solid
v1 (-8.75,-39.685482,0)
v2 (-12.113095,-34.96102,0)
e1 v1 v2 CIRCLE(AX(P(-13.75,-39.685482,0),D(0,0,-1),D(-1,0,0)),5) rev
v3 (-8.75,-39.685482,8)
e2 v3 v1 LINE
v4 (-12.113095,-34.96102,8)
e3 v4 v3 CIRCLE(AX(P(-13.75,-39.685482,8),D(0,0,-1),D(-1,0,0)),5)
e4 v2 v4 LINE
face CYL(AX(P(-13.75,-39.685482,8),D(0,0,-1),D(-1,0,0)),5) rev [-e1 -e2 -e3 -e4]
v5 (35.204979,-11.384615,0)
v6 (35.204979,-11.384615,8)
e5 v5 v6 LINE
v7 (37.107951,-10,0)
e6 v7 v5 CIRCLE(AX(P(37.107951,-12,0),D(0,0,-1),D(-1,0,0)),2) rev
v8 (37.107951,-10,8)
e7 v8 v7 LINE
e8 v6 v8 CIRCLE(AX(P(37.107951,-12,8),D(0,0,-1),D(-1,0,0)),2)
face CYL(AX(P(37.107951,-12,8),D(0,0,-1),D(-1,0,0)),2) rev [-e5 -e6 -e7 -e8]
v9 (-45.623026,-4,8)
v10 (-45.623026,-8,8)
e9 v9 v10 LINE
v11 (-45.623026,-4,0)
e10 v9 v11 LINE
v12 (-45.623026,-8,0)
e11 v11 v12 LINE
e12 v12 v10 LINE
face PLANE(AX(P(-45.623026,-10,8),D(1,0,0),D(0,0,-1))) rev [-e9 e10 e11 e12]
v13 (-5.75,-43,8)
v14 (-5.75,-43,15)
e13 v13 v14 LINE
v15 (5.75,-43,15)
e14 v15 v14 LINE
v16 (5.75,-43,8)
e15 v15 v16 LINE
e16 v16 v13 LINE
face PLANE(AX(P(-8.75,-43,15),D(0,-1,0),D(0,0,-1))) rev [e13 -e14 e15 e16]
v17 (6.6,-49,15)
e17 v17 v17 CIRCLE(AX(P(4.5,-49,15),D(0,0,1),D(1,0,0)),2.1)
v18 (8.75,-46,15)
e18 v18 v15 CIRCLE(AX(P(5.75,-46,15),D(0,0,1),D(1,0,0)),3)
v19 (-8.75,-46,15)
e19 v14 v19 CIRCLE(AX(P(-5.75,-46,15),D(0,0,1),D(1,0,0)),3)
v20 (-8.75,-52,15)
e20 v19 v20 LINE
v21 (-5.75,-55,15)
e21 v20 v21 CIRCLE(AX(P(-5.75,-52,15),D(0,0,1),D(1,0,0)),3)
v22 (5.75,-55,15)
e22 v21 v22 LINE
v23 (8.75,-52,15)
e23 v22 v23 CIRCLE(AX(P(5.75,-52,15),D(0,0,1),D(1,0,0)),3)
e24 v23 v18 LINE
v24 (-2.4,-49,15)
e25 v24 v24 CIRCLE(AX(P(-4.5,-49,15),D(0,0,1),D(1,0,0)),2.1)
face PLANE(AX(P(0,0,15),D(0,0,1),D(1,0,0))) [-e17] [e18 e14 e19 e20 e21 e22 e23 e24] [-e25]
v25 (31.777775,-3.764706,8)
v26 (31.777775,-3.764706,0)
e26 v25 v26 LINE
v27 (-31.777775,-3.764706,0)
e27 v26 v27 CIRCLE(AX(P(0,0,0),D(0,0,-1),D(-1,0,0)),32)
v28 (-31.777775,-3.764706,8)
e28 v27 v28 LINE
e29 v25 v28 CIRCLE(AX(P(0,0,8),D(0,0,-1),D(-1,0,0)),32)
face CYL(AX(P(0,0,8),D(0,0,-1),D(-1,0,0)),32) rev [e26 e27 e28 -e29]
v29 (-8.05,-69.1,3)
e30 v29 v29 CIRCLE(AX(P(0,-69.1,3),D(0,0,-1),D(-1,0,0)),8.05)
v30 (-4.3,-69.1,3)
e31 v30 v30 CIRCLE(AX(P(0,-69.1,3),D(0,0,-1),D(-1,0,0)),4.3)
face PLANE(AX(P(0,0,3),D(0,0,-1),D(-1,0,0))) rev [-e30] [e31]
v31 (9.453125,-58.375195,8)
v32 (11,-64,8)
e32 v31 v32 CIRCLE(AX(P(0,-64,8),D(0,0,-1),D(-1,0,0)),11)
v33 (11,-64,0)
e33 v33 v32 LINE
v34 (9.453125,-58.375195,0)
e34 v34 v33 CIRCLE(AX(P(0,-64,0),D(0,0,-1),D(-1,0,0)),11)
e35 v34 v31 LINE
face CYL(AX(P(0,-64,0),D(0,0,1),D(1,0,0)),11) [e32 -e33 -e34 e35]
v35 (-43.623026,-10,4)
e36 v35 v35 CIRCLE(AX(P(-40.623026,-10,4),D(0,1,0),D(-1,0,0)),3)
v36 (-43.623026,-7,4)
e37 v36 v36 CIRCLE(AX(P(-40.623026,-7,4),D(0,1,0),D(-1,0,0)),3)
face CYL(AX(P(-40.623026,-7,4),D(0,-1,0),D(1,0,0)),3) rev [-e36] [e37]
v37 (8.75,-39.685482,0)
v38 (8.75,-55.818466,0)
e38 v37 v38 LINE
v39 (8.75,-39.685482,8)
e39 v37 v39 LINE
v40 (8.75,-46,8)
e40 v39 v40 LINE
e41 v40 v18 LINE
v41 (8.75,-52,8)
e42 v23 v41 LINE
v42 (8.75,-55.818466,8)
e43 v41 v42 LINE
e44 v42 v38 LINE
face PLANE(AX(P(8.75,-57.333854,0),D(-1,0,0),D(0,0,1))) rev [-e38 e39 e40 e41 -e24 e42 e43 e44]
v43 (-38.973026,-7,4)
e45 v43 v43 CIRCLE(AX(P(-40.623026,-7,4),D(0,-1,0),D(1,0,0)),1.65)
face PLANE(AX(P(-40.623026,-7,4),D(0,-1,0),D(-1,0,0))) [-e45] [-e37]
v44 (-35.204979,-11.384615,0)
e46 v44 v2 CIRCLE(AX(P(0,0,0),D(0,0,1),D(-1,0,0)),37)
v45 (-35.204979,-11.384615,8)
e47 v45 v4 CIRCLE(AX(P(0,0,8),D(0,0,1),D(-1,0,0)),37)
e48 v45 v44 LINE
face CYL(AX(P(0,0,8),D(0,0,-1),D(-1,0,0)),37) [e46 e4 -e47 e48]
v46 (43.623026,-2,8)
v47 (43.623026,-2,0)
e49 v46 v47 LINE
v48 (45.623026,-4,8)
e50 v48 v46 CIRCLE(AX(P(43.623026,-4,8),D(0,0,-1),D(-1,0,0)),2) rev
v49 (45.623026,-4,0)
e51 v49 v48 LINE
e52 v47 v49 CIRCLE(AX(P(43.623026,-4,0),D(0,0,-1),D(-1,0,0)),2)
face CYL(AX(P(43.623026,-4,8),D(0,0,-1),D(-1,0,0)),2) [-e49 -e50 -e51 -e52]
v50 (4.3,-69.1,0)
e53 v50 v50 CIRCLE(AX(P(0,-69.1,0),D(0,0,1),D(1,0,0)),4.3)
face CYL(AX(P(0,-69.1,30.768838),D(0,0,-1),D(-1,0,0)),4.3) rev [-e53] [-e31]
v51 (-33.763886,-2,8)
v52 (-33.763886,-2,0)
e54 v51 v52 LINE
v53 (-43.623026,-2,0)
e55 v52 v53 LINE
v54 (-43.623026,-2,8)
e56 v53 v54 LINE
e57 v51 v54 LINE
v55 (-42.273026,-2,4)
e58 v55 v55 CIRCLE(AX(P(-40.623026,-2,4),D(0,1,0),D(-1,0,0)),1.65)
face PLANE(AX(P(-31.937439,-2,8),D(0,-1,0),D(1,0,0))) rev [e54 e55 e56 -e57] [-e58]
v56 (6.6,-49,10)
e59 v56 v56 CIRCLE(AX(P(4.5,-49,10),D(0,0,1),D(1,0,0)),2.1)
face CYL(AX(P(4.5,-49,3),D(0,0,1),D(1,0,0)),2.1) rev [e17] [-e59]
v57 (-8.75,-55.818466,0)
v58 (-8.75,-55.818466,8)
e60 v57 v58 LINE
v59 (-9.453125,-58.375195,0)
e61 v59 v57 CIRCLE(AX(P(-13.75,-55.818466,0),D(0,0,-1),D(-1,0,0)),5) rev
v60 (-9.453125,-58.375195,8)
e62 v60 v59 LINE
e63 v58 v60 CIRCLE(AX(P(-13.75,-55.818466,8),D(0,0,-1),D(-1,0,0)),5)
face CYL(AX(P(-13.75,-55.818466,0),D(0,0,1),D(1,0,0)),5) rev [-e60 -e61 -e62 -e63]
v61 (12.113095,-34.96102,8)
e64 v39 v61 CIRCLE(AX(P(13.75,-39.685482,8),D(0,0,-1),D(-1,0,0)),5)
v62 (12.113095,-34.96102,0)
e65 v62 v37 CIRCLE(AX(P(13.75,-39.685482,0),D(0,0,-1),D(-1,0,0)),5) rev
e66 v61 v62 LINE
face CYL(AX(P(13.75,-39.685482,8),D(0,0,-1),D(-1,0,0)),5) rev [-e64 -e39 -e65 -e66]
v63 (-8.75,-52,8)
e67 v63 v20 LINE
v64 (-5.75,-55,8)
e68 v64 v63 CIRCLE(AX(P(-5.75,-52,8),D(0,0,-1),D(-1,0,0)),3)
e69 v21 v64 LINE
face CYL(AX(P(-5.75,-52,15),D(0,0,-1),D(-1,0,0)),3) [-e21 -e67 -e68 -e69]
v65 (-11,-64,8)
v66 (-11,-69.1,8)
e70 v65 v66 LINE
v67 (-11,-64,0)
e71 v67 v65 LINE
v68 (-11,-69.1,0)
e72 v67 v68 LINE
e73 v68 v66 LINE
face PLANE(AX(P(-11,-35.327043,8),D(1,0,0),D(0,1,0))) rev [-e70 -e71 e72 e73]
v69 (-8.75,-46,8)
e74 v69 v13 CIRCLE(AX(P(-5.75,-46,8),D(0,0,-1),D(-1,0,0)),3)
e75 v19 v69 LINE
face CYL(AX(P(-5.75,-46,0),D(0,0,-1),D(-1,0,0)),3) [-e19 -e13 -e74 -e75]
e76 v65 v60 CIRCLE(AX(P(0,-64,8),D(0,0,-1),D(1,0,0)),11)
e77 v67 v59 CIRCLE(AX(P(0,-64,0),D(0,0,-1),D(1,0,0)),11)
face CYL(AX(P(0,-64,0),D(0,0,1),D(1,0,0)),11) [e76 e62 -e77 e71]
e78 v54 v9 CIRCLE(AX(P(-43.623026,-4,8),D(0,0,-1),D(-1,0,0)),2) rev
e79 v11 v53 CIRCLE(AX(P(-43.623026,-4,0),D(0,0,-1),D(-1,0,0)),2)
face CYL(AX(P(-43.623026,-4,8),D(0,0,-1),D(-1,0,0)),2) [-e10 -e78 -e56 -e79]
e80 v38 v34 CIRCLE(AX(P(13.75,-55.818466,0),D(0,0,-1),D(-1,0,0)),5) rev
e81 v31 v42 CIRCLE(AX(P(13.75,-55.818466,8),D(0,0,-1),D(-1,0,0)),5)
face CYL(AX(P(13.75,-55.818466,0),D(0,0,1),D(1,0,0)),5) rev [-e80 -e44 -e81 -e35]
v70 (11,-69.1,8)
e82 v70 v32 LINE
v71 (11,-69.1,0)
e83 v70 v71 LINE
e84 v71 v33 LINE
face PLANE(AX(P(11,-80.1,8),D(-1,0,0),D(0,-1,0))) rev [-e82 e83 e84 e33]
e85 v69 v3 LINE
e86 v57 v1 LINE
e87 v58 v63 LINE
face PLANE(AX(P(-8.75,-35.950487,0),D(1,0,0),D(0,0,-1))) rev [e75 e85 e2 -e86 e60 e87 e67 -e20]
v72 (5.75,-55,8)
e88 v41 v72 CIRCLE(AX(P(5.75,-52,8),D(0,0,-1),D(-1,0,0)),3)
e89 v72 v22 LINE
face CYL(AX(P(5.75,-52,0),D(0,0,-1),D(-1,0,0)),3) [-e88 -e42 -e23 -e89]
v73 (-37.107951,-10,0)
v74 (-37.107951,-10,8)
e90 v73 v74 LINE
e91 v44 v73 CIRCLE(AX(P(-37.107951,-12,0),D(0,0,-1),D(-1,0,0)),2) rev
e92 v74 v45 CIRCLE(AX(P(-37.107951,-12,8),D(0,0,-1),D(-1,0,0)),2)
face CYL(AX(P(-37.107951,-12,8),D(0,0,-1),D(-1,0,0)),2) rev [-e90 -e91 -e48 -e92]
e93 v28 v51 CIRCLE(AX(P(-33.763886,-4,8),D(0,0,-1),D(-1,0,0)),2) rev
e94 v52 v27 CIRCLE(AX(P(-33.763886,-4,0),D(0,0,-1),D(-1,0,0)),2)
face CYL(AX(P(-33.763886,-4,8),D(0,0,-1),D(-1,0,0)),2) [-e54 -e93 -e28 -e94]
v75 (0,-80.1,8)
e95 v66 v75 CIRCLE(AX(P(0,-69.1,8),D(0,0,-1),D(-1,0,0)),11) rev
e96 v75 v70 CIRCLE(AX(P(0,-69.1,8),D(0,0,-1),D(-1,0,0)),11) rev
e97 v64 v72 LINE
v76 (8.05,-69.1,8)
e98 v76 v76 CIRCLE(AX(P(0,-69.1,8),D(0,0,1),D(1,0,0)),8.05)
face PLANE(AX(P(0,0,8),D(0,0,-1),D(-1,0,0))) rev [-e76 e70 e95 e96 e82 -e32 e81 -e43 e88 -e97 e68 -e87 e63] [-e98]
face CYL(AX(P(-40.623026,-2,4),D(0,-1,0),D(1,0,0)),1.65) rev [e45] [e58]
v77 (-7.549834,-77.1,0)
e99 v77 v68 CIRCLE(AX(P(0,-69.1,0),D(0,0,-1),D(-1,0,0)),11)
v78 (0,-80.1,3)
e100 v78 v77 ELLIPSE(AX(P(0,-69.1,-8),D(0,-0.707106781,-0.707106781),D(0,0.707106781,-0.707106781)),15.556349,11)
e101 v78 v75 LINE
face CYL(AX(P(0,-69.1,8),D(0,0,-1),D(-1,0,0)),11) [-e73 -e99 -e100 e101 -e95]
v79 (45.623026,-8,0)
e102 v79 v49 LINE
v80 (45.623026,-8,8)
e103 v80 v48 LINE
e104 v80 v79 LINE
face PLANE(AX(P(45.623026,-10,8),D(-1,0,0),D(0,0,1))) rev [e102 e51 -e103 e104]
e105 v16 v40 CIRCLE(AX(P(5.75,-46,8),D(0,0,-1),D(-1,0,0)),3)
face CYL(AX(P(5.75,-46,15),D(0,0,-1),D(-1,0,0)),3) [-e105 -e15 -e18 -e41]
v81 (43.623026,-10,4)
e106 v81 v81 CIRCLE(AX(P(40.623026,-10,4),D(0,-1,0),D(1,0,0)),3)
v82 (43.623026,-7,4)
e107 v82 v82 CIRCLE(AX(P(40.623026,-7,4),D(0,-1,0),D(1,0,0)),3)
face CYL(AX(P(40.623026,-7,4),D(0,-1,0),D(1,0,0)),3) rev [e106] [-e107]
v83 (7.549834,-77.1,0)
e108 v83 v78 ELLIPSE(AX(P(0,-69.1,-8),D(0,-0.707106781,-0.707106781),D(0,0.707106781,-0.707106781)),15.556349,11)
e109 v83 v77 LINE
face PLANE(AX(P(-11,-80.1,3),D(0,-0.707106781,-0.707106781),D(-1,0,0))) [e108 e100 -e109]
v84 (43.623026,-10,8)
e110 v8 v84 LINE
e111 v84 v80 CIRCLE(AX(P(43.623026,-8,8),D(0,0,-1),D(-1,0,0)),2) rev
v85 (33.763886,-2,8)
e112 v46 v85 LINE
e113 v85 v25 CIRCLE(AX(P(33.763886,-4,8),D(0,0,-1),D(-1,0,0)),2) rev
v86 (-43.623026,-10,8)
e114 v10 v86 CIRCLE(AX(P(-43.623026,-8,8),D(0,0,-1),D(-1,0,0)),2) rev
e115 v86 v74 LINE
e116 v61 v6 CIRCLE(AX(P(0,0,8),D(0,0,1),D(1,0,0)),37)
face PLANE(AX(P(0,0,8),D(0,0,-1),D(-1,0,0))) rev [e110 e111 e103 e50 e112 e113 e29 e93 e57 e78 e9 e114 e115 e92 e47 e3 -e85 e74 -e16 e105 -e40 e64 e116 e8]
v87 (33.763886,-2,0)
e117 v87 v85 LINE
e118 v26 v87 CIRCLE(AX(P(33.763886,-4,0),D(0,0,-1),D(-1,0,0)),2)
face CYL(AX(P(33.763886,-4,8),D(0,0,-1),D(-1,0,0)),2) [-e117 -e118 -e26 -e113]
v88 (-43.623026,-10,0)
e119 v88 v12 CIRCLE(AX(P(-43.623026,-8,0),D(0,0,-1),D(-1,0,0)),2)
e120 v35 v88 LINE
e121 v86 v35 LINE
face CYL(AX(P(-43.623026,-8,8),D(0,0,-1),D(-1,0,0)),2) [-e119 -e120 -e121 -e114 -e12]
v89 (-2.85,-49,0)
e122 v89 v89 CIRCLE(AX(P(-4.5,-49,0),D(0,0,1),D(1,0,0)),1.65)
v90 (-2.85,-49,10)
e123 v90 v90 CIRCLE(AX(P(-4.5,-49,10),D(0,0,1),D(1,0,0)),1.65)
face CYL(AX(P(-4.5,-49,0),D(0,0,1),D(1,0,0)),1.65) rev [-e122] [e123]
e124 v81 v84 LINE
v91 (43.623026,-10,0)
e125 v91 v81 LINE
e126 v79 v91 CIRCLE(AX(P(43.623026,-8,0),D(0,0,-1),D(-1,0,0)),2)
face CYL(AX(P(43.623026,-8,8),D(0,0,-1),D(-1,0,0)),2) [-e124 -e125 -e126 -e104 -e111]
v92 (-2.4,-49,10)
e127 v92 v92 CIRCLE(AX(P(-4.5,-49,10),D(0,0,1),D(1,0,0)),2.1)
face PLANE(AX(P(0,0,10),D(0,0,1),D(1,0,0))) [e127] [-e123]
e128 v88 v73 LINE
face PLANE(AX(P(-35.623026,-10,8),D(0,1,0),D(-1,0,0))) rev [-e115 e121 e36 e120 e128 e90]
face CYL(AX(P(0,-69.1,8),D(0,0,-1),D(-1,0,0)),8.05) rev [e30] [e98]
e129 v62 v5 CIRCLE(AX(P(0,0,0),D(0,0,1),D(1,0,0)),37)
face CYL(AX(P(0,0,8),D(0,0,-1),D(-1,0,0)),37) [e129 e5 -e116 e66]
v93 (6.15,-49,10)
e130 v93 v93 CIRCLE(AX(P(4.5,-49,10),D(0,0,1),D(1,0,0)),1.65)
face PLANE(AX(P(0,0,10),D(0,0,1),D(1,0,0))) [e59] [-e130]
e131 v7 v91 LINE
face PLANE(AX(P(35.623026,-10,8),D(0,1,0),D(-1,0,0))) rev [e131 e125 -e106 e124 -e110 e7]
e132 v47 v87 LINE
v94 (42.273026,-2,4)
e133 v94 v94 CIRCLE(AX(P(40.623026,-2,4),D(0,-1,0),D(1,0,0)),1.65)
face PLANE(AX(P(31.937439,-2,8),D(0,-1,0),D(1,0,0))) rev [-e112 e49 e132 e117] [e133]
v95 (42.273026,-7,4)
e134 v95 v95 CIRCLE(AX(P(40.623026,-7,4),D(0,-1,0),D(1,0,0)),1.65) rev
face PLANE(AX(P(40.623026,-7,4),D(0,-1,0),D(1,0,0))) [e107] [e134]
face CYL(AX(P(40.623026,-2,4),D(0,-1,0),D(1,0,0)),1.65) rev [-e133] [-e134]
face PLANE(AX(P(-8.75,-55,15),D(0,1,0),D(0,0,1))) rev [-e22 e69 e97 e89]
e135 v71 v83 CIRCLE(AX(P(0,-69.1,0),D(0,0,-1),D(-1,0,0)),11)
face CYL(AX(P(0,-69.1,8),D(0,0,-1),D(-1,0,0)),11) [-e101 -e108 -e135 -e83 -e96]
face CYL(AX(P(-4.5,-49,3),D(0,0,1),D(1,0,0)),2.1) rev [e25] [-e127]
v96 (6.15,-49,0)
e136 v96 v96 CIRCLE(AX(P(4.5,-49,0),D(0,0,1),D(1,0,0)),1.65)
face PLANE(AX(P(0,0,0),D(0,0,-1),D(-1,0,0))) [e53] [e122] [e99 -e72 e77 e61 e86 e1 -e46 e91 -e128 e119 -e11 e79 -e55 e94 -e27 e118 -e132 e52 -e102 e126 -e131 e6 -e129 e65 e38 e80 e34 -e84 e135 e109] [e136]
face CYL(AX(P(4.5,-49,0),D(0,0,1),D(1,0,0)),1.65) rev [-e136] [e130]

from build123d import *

# Parameters (mm, degrees)
SKETCH3_R           = 8.05
BOSS_EXTRUDE1_DEPTH = 8
SKETCH4_R           = 8.05
SKETCH4_R_2         = 4.3
BOSS_EXTRUDE2_DEPTH = 3
CHAMFER1_SIZE       = 3
FILLET1_R           = 11
SKETCH5_R           = 1.65
CUT_EXTRUDE1_DEPTH  = 85.020655349
SKETCH6_R           = 3
CUT_EXTRUDE2_DEPTH  = 3
SKETCH7_R           = 2.1
CUT_EXTRUDE3_DEPTH  = 5
SKETCH8_R           = 1.65
CUT_EXTRUDE4_DEPTH  = 93.528214752
CUT_EXTRUDE5_DEPTH  = 93.528214752
FILLET2_R           = 5
FILLET3_R           = 2
BOSS_EXTRUDE3_START = 7
SKETCH10_W          = 17.5
SKETCH10_H          = 12
SKETCH10_R          = 2.1
BOSS_EXTRUDE3_DEPTH = 7
FILLET4_R           = 3
BOSS_EXTRUDE4_START = 7
SKETCH11_R          = 2.1
SKETCH11_R_2        = 1.65
BOSS_EXTRUDE4_DEPTH = 7


with BuildPart() as part:
    # Sketch3 → Boss-Extrude1 (new body)
    with BuildSketch(Plane.XY):
        with BuildLine():
            Line((-31.937438845, -2), (-45.623026261, -2))
            Line((-45.623026261, -2), (-45.623026261, -10))
            Line((-45.623026261, -10), (-35.623026261, -10))
            ThreePointArc((-35.623026261, -10), (-26.529067588, -25.791637654), (-11, -35.327043465))
            Line((-11, -35.327043465), (-11, -80.1))
            Line((-11, -80.1), (11, -80.1))
            Line((11, -80.1), (11, -35.327043465))
            ThreePointArc((11, -35.327043465), (26.529067588, -25.791637654), (35.623026261, -10))
            Line((35.623026261, -10), (45.623026261, -10))
            Line((45.623026261, -10), (45.623026261, -2))
            Line((45.623026261, -2), (31.937438845, -2))
            ThreePointArc((31.937438845, -2), (0, -32), (-31.937438845, -2))
        make_face()
        with Locations((0, -69.1)):
            Circle(SKETCH3_R, mode=Mode.SUBTRACT)
    extrude(amount=BOSS_EXTRUDE1_DEPTH)

    # Sketch4 → Boss-Extrude2 (add)
    with BuildSketch(Plane.XY):
        with Locations(Location((0, -69.1, 0), (0, 0, 180))):
            Circle(SKETCH4_R)
        with Locations(Location((0, -69.1, 0), (0, 0, 180))):
            Circle(SKETCH4_R_2, mode=Mode.SUBTRACT)
    extrude(amount=BOSS_EXTRUDE2_DEPTH)

    # Chamfer1
    chamfer1_edges = [part.edges().sort_by_distance(p)[0] for p in [
        (0, -80.1, 0),
    ]]
    chamfer(chamfer1_edges, length=CHAMFER1_SIZE)

    # Fillet1
    fillet1_edges = [part.edges().sort_by_distance(p)[0] for p in [
        (-11, -80.1, 5.5),
        (11, -80.1, 5.5),
    ]]
    fillet(fillet1_edges, radius=FILLET1_R - 0.0001)  # a hair under: the kernel refuses the full size

    # Sketch5 → Cut-Extrude1 (cut, through all)
    with BuildSketch(Plane.XZ.offset(10)):
        with Locations((40.623026261, 4)):
            Circle(SKETCH5_R)
    cut_extrude1 = extrude(amount=-CUT_EXTRUDE1_DEPTH, mode=Mode.SUBTRACT)

    # Sketch6 → Cut-Extrude2 (cut)
    with BuildSketch(Plane.XZ.offset(10)):
        with Locations((40.623026261, 4)):
            Circle(SKETCH6_R)
    cut_extrude2 = extrude(amount=-CUT_EXTRUDE2_DEPTH, mode=Mode.SUBTRACT)

    # Mirror1: Cut-Extrude1, Cut-Extrude2 across plane
    add(cut_extrude1.mirror(Plane(origin=(0, 0, 0), x_dir=(0, 0, 1), z_dir=(1, 0, 0))), mode=Mode.SUBTRACT)
    add(cut_extrude2.mirror(Plane(origin=(0, 0, 0), x_dir=(0, 0, 1), z_dir=(1, 0, 0))), mode=Mode.SUBTRACT)

    # Sketch7 → Cut-Extrude3 (cut)
    with BuildSketch(Plane.XY.offset(8)):
        with Locations((-4.5, -49)):
            Circle(SKETCH7_R)
        with Locations((4.5, -49)):
            Circle(SKETCH7_R)
    extrude(amount=-CUT_EXTRUDE3_DEPTH, mode=Mode.SUBTRACT)

    # Sketch8 → Cut-Extrude4 (cut, through all)
    with BuildSketch(Plane.XY.offset(8)):
        with Locations((4.5, -49)):
            Circle(SKETCH8_R)
        with Locations((-4.5, -49)):
            Circle(SKETCH8_R)
    extrude(amount=-CUT_EXTRUDE4_DEPTH, mode=Mode.SUBTRACT)

    # Sketch9 → Cut-Extrude5 (cut, through all)
    with BuildSketch(Plane.XY.offset(8)):
        with BuildLine():
            Line((-8.75, -35.950486784), (-8.75, -57.333854187))
            ThreePointArc((-8.75, -57.333854187), (-10.422331793, -60.48218818), (-11, -64))
            Line((-11, -64), (-11, -35.327043465))
            ThreePointArc((-11, -35.327043465), (-9.879918795, -35.656517001), (-8.75, -35.950486784))
        make_face()
        with BuildLine():
            Line((8.75, -57.333854187), (8.75, -35.950486784))
            ThreePointArc((8.75, -35.950486784), (9.879918795, -35.656517001), (11, -35.327043465))
            Line((11, -35.327043465), (11, -64))
            ThreePointArc((11, -64), (10.422331793, -60.48218818), (8.75, -57.333854187))
        make_face()
    extrude(amount=-CUT_EXTRUDE5_DEPTH, mode=Mode.SUBTRACT)

    # Fillet2
    fillet2_edges = [part.edges().sort_by_distance(p)[0] for p in [
        (-8.75, -35.950486784, 4),
        (-8.75, -57.333854187, 4),
        (8.75, -57.333854187, 4),
        (8.75, -35.950486784, 4),
    ]]
    fillet(fillet2_edges, radius=FILLET2_R)

    # Fillet3
    fillet3_edges = [part.edges().sort_by_distance(p)[0] for p in [
        (-45.623026261, -2, 4),
        (-31.937438845, -2, 4),
        (31.937438845, -2, 4),
        (45.623026261, -2, 4),
        (45.623026261, -10, 4),
        (35.623026261, -10, 4),
        (-35.623026261, -10, 4),
        (-45.623026261, -10, 4),
    ]]
    fillet(fillet3_edges, radius=FILLET3_R - 0.0001)  # a hair under: the kernel refuses the full size

    # Sketch10 → Boss-Extrude3 (add)
    with BuildSketch(Plane.XY.offset(8).offset(BOSS_EXTRUDE3_START)):
        with Locations((0, -49)):
            Rectangle(SKETCH10_W, SKETCH10_H)
        with Locations((4.5, -49)):
            Circle(SKETCH10_R, mode=Mode.SUBTRACT)
        with Locations((-4.5, -49)):
            Circle(SKETCH10_R, mode=Mode.SUBTRACT)
    extrude(amount=-BOSS_EXTRUDE3_DEPTH)

    # Fillet4
    fillet4_edges = [part.edges().sort_by_distance(p)[0] for p in [
        (-8.75, -43, 11.5),
        (-8.75, -55, 11.5),
        (8.75, -55, 11.5),
        (8.75, -43, 11.5),
    ]]
    fillet(fillet4_edges, radius=FILLET4_R)

    # Sketch11 → Boss-Extrude4 (add)
    # profile 1 of 2: a face of its own
    with BuildSketch(Plane.XY.offset(3).offset(BOSS_EXTRUDE4_START)):
        with Locations((4.5, -49)):
            Circle(SKETCH11_R)
        with Locations((4.5, -49)):
            Circle(SKETCH11_R_2, mode=Mode.SUBTRACT)
    # profile 2 of 2: a face of its own
    with BuildSketch(Plane.XY.offset(3).offset(BOSS_EXTRUDE4_START)):
        with Locations((-4.5, -49)):
            Circle(SKETCH11_R)
        with Locations((-4.5, -49)):
            Circle(SKETCH11_R_2, mode=Mode.SUBTRACT)
    extrude(amount=-BOSS_EXTRUDE4_DEPTH)


solid = part.part
